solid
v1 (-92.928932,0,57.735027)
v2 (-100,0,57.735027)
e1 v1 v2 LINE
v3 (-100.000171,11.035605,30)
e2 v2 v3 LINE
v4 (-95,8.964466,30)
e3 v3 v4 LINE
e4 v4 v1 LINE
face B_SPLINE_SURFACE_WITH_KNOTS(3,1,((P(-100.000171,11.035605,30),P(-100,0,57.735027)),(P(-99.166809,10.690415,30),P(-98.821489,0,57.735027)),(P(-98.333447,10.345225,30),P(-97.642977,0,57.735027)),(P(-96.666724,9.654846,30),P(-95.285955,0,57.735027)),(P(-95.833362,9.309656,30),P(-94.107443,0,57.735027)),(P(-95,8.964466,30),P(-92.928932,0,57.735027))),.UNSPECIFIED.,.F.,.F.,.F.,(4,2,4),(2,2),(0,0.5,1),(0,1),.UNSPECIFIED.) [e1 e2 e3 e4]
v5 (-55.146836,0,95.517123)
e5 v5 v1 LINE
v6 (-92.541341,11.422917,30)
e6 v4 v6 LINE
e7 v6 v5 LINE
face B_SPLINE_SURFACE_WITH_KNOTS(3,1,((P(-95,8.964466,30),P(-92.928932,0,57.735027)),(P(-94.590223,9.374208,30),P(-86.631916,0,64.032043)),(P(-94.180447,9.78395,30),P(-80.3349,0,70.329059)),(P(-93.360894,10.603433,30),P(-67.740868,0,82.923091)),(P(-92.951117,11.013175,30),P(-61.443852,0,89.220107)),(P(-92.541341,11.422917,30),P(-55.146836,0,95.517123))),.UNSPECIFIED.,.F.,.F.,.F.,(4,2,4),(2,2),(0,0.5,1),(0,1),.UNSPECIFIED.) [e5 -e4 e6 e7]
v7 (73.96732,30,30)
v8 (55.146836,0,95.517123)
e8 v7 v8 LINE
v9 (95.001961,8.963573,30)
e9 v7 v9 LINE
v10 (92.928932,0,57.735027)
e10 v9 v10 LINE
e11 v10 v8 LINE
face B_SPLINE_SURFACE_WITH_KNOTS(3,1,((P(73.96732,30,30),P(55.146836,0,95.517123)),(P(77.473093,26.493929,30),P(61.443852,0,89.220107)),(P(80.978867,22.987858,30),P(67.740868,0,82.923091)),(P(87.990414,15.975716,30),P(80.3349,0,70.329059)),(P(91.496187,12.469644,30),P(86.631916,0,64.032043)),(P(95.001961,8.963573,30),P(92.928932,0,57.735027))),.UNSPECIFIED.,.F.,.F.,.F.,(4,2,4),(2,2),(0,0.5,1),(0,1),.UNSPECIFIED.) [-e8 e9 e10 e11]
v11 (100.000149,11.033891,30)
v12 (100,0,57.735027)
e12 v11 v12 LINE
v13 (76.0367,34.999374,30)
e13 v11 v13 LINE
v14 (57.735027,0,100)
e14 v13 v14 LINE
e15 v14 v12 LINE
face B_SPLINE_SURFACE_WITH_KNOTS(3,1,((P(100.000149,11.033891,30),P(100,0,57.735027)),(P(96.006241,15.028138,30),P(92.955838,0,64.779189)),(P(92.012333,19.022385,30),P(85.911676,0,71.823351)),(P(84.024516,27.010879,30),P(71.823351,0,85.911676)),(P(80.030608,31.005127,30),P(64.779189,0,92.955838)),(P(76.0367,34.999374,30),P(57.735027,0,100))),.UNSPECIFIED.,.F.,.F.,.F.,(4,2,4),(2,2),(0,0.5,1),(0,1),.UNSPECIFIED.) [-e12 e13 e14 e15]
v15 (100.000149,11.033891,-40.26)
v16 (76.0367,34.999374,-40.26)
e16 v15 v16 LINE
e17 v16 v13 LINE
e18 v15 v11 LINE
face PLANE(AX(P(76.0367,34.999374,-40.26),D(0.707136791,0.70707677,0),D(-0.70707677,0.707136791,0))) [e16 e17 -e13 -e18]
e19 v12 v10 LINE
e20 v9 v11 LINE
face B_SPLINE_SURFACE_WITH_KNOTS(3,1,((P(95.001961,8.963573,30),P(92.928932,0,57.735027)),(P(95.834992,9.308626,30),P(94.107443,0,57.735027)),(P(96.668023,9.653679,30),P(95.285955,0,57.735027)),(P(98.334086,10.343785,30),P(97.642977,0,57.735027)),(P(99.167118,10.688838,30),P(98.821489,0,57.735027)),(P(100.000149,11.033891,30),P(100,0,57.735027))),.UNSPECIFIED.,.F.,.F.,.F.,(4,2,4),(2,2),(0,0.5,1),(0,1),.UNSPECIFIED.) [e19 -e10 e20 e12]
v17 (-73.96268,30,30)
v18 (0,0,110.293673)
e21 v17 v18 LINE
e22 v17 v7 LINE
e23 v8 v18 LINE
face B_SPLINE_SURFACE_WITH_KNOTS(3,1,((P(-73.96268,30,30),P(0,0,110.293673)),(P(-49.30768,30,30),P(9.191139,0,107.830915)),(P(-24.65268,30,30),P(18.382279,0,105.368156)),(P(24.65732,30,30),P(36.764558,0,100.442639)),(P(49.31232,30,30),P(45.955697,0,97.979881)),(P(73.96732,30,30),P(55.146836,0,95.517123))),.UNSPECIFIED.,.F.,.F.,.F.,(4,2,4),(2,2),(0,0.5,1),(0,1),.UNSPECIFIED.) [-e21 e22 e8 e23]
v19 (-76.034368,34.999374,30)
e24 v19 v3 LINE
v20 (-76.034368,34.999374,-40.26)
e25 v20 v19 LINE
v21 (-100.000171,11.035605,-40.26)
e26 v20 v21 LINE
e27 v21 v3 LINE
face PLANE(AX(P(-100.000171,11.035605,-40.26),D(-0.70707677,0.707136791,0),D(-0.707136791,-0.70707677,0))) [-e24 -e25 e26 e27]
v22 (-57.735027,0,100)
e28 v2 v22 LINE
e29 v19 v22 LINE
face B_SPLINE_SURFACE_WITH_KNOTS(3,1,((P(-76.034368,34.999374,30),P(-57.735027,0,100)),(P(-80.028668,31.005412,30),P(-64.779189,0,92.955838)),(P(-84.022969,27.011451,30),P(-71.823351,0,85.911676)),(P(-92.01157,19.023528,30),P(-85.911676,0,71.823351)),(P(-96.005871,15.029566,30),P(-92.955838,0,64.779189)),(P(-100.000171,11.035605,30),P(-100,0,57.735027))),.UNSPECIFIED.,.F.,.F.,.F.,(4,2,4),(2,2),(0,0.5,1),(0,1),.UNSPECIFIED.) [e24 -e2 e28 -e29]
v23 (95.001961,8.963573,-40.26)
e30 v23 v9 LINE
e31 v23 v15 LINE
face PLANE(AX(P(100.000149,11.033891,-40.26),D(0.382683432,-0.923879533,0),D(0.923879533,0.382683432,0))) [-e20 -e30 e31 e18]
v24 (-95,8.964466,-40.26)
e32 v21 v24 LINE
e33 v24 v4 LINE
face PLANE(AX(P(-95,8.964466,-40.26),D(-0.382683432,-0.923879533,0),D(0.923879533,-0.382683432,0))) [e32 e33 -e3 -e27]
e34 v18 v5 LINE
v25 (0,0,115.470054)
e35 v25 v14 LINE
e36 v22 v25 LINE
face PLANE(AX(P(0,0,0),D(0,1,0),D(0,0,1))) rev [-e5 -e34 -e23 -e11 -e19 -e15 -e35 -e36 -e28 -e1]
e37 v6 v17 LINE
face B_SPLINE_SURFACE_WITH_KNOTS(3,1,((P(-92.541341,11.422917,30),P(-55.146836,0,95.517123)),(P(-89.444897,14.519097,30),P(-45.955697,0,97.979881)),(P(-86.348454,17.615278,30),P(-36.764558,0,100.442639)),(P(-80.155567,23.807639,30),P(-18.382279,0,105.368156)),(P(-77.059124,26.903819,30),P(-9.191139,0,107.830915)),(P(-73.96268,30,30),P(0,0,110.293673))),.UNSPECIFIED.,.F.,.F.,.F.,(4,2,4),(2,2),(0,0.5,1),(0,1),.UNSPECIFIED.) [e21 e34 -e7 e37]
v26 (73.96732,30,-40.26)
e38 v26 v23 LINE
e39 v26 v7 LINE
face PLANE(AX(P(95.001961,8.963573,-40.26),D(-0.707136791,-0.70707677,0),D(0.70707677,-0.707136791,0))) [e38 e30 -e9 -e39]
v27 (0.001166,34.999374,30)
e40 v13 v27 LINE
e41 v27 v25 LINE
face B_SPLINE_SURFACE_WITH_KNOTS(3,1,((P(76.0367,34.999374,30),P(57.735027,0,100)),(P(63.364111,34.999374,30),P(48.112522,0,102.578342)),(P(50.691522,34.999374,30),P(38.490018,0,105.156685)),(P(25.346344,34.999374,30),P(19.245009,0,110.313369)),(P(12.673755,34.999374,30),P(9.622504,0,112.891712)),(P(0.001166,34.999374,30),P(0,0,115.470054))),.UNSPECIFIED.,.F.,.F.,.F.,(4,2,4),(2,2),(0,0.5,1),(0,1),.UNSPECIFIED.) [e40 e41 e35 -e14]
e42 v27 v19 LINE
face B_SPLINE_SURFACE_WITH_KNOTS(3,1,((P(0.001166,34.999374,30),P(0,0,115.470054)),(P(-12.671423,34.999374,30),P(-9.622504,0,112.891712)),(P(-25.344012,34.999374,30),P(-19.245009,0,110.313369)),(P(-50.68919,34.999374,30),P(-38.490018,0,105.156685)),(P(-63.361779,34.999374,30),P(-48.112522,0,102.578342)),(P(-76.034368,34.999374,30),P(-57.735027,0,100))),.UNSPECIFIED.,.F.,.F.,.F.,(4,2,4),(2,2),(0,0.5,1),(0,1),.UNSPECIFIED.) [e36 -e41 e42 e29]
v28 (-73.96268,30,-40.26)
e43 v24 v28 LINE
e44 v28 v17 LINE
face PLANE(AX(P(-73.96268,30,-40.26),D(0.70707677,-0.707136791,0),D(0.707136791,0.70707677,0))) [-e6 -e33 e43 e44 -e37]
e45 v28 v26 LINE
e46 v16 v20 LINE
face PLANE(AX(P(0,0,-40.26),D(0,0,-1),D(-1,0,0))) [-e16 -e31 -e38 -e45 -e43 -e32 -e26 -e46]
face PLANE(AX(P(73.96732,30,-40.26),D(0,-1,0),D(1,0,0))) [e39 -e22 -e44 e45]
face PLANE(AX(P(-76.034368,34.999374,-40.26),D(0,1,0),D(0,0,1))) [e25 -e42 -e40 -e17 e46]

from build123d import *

# Parameters (mm, degrees)
BOSS_EXTRUDE1_DEPTH = 70.26


with BuildPart() as part:
    # Loft13: read off the stored shape, not the designer's step
    # Loft13: loft between two sections, ruled curve by curve
    loft13_from = [
        Edge.make_bspline([(-100.000171146, 11.035604797, 30), (-99.166809288, 10.690415013, 30), (-98.33344743, 10.345225229, 30), (-96.666723715, 9.654845662, 30), (-95.833361858, 9.309655878, 30), (-95, 8.964466094, 30)], [0, 0, 0, 0, 0.5, 0.5, 1, 1, 1, 1], 3),
        Edge.make_bspline([(-95, 8.964466094, 30), (-94.590223449, 9.374207863, 30), (-94.180446899, 9.783949632, 30), (-93.360893797, 10.603433171, 30), (-92.951117247, 11.01317494, 30), (-92.541340696, 11.422916709, 30)], [0, 0, 0, 0, 0.5, 0.5, 1, 1, 1, 1], 3),
        Edge.make_bspline([(-76.034367882, 34.999373863, 30), (-80.028668426, 31.005412352, 30), (-84.02296897, 27.011450841, 30), (-92.011570058, 19.023527819, 30), (-96.005870602, 15.029566308, 30), (-100.000171146, 11.035604797, 30)], [0, 0, 0, 0, 0.5, 0.5, 1, 1, 1, 1], 3),
        Edge.make_bspline([(-92.541340696, 11.422916709, 30), (-89.444897324, 14.519097257, 30), (-86.348453952, 17.615277806, 30), (-80.155567208, 23.807638903, 30), (-77.059123835, 26.903819451, 30), (-73.962680463, 30, 30)], [0, 0, 0, 0, 0.5, 0.5, 1, 1, 1, 1], 3),
        Edge.make_bspline([(-73.962680463, 30, 30), (-49.307680463, 30, 30), (-24.652680463, 30, 30), (24.657319537, 30, 30), (49.312319537, 30, 30), (73.967319537, 30, 30)], [0, 0, 0, 0, 0.5, 0.5, 1, 1, 1, 1], 3),
        Edge.make_bspline([(73.967319537, 30, 30), (77.473093055, 26.493928889, 30), (80.978866573, 22.987857778, 30), (87.99041361, 15.975715557, 30), (91.496187128, 12.469644446, 30), (95.001960646, 8.963573335, 30)], [0, 0, 0, 0, 0.5, 0.5, 1, 1, 1, 1], 3),
        Edge.make_bspline([(95.001960646, 8.963573335, 30), (95.834992025, 9.30862623, 30), (96.668023403, 9.653679125, 30), (98.33408616, 10.343784915, 30), (99.167117539, 10.68883781, 30), (100.000148917, 11.033890705, 30)], [0, 0, 0, 0, 0.5, 0.5, 1, 1, 1, 1], 3),
        Edge.make_bspline([(100.000148917, 11.033890705, 30), (96.006240753, 15.028137898, 30), (92.012332588, 19.022385091, 30), (84.024516259, 27.010879477, 30), (80.030608095, 31.00512667, 30), (76.03669993, 34.999373863, 30)], [0, 0, 0, 0, 0.5, 0.5, 1, 1, 1, 1], 3),
        Edge.make_bspline([(76.03669993, 34.999373863, 30), (63.364110946, 34.999373863, 30), (50.691521962, 34.999373863, 30), (25.346343993, 34.999373863, 30), (12.673755009, 34.999373863, 30), (0.001166024, 34.999373863, 30)], [0, 0, 0, 0, 0.5, 0.5, 1, 1, 1, 1], 3),
        Edge.make_bspline([(0.001166024, 34.999373863, 30), (-12.67142296, 34.999373863, 30), (-25.344011944, 34.999373863, 30), (-50.689189913, 34.999373863, 30), (-63.361778897, 34.999373863, 30), (-76.034367882, 34.999373863, 30)], [0, 0, 0, 0, 0.5, 0.5, 1, 1, 1, 1], 3),
    ]
    loft13_to = [
        Edge.make_bspline([(-100, 0, 57.735026919), (-98.821488698, 0, 57.735026919), (-97.642977396, 0, 57.735026919), (-95.285954792, 0, 57.735026919), (-94.10744349, 0, 57.735026919), (-92.928932188, 0, 57.735026919)], [0, 0, 0, 0, 0.5, 0.5, 1, 1, 1, 1], 3),
        Edge.make_bspline([(-92.928932188, 0, 57.735026919), (-86.631916235, 0, 64.032042873), (-80.334900281, 0, 70.329058826), (-67.740868375, 0, 82.923090733), (-61.443852421, 0, 89.220106686), (-55.146836468, 0, 95.517122639)], [0, 0, 0, 0, 0.5, 0.5, 1, 1, 1, 1], 3),
        Edge.make_bspline([(-57.735026919, 0, 100), (-64.779189099, 0, 92.95583782), (-71.823351279, 0, 85.91167564), (-85.91167564, 0, 71.82335128), (-92.95583782, 0, 64.7791891), (-100, 0, 57.735026919)], [0, 0, 0, 0, 0.5, 0.5, 1, 1, 1, 1], 3),
        Edge.make_bspline([(-55.146836468, 0, 95.517122639), (-45.955697057, 0, 97.979881022), (-36.764557645, 0, 100.442639405), (-18.382278823, 0, 105.368156171), (-9.191139411, 0, 107.830914553), (0, 0, 110.293672936)], [0, 0, 0, 0, 0.5, 0.5, 1, 1, 1, 1], 3),
        Edge.make_bspline([(0, 0, 110.293672936), (9.191139411, 0, 107.830914553), (18.382278823, 0, 105.368156171), (36.764557645, 0, 100.442639405), (45.955697057, 0, 97.979881022), (55.146836468, 0, 95.517122639)], [0, 0, 0, 0, 0.5, 0.5, 1, 1, 1, 1], 3),
        Edge.make_bspline([(55.146836468, 0, 95.517122639), (61.443852421, 0, 89.220106686), (67.740868375, 0, 82.923090733), (80.334900281, 0, 70.329058826), (86.631916235, 0, 64.032042873), (92.928932188, 0, 57.735026919)], [0, 0, 0, 0, 0.5, 0.5, 1, 1, 1, 1], 3),
        Edge.make_bspline([(92.928932188, 0, 57.735026919), (94.10744349, 0, 57.735026919), (95.285954792, 0, 57.735026919), (97.642977396, 0, 57.735026919), (98.821488698, 0, 57.735026919), (100, 0, 57.735026919)], [0, 0, 0, 0, 0.5, 0.5, 1, 1, 1, 1], 3),
        Edge.make_bspline([(100, 0, 57.735026919), (92.95583782, 0, 64.7791891), (85.91167564, 0, 71.82335128), (71.823351279, 0, 85.91167564), (64.779189099, 0, 92.95583782), (57.735026919, 0, 100)], [0, 0, 0, 0, 0.5, 0.5, 1, 1, 1, 1], 3),
        Edge.make_bspline([(57.735026919, 0, 100), (48.112522433, 0, 102.578342307), (38.490017946, 0, 105.156684613), (19.245008973, 0, 110.313369226), (9.622504487, 0, 112.891711532), (0, 0, 115.470053838)], [0, 0, 0, 0, 0.5, 0.5, 1, 1, 1, 1], 3),
        Edge.make_bspline([(0, 0, 115.470053838), (-9.622504487, 0, 112.891711532), (-19.245008973, 0, 110.313369226), (-38.490017946, 0, 105.156684613), (-48.112522433, 0, 102.578342307), (-57.735026919, 0, 100)], [0, 0, 0, 0, 0.5, 0.5, 1, 1, 1, 1], 3),
    ]
    loft13 = Solid(Shell([*[Face.make_surface_from_curves(loft13_from[k], loft13_to[k]) for k in range(10)], Face(Wire(loft13_from)), Face(Wire(loft13_to))]))
    add(loft13)

    # Sketch9 → Boss-Extrude1 (add)
    with BuildSketch(Plane.XY.offset(30)):
        Polygon((100.000148917, 11.033890705), (95.001960646, 8.963573335), (73.967319537, 30), (-73.962680463, 30), (-95, 8.964466094), (-100.000171146, 11.035604797), (-76.034367882, 34.999373863), (76.03669993, 34.999373863), align=None)
    extrude(amount=-BOSS_EXTRUDE1_DEPTH)


solid = part.part
